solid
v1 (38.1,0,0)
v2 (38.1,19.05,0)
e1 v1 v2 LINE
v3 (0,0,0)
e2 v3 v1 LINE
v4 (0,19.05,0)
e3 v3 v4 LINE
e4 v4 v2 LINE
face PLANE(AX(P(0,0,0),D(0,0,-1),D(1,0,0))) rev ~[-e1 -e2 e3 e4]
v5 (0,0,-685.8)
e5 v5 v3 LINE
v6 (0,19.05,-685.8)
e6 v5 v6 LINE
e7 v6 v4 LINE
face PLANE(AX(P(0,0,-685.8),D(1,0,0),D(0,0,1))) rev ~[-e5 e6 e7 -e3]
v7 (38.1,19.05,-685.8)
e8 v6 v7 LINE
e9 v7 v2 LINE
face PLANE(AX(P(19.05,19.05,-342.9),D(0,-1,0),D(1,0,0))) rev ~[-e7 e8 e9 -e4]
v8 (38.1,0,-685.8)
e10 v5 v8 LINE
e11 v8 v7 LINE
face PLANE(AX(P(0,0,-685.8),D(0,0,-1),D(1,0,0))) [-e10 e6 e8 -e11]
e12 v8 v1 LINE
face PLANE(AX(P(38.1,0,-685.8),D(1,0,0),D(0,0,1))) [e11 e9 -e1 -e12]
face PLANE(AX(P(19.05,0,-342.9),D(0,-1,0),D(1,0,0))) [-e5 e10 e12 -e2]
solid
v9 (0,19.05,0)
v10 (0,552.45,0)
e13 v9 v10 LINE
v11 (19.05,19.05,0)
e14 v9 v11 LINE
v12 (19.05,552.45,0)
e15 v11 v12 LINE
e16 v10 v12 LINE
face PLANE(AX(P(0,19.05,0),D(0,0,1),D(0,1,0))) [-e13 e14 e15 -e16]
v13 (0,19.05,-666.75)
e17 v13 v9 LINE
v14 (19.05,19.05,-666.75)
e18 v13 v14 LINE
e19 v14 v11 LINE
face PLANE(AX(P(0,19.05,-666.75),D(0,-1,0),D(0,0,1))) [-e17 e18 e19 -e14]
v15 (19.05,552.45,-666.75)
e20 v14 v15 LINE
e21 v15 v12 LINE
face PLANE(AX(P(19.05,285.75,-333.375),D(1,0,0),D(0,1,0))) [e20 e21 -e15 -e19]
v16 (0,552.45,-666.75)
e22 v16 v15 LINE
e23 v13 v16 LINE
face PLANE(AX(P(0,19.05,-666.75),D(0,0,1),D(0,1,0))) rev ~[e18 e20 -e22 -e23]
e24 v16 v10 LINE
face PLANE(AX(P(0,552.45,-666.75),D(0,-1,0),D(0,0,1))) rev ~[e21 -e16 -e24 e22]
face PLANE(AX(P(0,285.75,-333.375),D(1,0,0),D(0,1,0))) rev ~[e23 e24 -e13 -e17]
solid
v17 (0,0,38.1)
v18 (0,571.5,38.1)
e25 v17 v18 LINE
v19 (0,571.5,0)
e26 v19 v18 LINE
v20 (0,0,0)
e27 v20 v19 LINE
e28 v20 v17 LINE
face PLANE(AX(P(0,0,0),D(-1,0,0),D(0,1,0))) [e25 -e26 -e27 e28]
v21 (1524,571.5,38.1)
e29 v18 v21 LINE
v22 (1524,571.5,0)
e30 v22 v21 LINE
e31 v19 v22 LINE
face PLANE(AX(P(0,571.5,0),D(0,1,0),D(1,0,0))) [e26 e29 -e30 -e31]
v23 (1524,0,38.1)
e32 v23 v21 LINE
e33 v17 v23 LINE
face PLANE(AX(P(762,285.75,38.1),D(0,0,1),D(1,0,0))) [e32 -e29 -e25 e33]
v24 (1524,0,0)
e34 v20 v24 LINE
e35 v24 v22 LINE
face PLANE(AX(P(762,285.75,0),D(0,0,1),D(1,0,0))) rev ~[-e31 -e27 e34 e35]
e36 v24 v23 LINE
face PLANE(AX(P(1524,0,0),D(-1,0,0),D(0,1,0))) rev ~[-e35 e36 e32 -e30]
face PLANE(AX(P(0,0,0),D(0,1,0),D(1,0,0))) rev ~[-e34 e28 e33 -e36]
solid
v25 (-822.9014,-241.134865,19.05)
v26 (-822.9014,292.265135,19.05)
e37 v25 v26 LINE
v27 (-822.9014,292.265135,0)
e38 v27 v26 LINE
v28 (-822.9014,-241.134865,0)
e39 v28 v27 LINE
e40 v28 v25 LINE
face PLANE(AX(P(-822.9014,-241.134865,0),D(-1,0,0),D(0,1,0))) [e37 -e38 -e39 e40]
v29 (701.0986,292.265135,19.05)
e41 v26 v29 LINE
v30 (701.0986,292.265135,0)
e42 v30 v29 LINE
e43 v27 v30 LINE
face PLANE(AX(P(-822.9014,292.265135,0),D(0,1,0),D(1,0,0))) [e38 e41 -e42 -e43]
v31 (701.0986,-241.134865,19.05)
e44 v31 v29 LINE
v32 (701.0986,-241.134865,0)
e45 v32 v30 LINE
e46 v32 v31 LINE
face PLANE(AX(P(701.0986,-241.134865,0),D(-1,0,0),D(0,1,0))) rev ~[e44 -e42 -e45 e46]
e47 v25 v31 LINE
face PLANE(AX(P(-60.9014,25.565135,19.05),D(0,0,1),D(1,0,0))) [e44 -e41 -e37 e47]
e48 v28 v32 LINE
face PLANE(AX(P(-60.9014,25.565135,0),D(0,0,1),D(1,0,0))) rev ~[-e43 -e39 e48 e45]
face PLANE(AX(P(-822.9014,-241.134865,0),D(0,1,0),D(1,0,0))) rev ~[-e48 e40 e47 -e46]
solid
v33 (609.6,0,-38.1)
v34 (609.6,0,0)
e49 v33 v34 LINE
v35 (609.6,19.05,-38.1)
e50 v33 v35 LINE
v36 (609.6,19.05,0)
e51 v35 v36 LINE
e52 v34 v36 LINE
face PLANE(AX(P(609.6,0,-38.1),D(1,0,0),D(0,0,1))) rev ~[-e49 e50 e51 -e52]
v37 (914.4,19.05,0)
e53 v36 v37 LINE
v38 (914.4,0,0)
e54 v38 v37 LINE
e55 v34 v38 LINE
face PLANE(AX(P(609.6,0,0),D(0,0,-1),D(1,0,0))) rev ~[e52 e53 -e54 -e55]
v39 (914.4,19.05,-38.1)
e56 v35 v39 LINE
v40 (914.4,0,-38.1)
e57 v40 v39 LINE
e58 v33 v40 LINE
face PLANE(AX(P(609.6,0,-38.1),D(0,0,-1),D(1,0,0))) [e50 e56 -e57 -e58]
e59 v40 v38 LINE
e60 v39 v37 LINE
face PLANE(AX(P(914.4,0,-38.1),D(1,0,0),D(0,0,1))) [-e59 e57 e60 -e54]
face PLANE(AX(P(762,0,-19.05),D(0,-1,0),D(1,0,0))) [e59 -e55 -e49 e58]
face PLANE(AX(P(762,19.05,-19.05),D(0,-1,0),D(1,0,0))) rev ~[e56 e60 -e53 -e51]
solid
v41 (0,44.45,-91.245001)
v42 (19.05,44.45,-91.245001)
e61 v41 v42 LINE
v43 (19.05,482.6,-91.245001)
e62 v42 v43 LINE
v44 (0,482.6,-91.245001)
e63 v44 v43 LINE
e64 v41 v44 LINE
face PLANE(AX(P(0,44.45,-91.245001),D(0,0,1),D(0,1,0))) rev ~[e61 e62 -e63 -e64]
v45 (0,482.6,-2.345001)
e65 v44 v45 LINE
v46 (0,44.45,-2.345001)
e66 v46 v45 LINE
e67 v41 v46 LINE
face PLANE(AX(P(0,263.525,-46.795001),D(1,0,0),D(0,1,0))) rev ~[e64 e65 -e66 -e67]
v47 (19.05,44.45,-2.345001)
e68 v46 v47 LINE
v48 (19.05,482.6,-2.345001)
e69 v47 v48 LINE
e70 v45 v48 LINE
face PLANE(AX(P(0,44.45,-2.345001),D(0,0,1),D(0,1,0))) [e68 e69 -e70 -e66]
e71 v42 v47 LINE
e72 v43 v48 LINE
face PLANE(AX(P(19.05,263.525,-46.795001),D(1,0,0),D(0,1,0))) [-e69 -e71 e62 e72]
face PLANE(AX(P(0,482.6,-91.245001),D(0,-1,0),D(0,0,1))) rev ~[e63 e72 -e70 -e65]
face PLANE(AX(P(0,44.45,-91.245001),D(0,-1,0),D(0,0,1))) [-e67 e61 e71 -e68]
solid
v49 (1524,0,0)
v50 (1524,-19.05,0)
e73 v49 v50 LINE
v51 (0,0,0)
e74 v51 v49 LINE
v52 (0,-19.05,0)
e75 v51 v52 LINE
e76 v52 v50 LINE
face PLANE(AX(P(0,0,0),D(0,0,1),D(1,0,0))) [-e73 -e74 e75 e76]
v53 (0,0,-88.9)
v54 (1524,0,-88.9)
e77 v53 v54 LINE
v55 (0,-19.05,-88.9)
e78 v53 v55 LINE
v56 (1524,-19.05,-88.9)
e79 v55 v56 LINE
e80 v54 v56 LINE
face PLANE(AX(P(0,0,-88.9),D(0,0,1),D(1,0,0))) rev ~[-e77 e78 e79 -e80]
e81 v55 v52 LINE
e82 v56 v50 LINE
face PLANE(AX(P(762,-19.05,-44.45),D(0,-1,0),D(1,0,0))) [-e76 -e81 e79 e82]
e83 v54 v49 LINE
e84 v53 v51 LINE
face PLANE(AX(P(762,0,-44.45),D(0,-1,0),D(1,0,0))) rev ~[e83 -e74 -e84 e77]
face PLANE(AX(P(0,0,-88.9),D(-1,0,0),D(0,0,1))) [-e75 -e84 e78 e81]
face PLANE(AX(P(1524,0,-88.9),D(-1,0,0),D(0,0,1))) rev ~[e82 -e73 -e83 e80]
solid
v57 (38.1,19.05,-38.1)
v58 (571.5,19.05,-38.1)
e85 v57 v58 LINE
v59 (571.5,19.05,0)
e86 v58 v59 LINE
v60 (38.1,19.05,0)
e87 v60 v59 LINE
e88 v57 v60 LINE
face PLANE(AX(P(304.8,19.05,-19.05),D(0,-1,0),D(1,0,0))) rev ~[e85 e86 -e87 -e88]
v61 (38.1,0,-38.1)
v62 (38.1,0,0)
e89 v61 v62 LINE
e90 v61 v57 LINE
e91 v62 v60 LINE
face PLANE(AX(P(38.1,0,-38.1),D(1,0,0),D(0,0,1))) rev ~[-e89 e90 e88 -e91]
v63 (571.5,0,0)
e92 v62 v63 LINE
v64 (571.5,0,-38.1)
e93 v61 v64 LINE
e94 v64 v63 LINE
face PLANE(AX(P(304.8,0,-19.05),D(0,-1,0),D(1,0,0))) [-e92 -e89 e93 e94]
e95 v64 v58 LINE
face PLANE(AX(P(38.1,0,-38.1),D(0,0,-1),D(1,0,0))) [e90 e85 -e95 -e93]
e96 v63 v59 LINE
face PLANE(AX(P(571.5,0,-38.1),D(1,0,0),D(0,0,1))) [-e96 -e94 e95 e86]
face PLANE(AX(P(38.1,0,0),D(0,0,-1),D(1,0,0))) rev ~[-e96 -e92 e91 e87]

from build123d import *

# Parameters (mm, degrees)
F0_W      = 1524
F0_H      = 571.5
F1_DEPTH  = 38.1
F2_W      = 38.1
F2_H      = 685.8
F3_DEPTH  = 19.05
F4_W      = 533.4
F4_H      = 38.1
F6_DEPTH  = 19.05
F5_W      = 304.8
F5_H      = 38.1
F7_DEPTH  = 19.05
F8_W      = 533.4
F8_H      = 666.75
F9_DEPTH  = 19.05
F10_W     = 1524
F10_H     = 533.4
F11_DEPTH = 19.05
F12_W     = 1524
F12_H     = 88.9
F13_DEPTH = 19.05
F14_W     = 438.15
F14_H     = 88.9
F15_DEPTH = 19.05


# Not quite as in the source:
# - a feature names something its author has since deleted; it is built from what else it names


with BuildPart() as f1:
    # F0 (on Top) → F1 (new body)
    with BuildSketch(Plane.XY):
        with Locations((762, 285.75)):
            Rectangle(F0_W, F0_H)
    extrude(amount=F1_DEPTH)


with BuildPart() as f3:
    # F2 (on Front) → F3 (new body)
    with BuildSketch(Plane.XZ):
        with Locations((19.05, -342.9)):
            Rectangle(F2_W, F2_H)
    extrude(amount=-F3_DEPTH)


with BuildPart() as f6:
    # F4 (on Front) → F6 (new body)
    with BuildSketch(Plane.XZ):
        with Locations((304.8, -19.05)):
            Rectangle(F4_W, F4_H)
    extrude(amount=-F6_DEPTH)


with BuildPart() as f7:
    # F5 (on Front) → F7 (new body)
    with BuildSketch(Plane.XZ):
        with Locations((762, -19.05)):
            Rectangle(F5_W, F5_H)
    extrude(amount=-F7_DEPTH)


with BuildPart() as f9:
    # F8 (on Right) → F9 (new body)
    with BuildSketch(Plane.YZ):
        with Locations((285.75, -333.375)):
            Rectangle(F8_W, F8_H)
    extrude(amount=F9_DEPTH)


with BuildPart() as f11:
    # F10 (on Top) → F11 (new body)
    with BuildSketch(Plane.XY):
        with Locations((-60.9013997018, 25.5651345968)):
            Rectangle(F10_W, F10_H)
    extrude(amount=F11_DEPTH)


with BuildPart() as f13:
    # F12 (on Front) → F13 (new body)
    with BuildSketch(Plane.XZ):
        with Locations((762, -44.45)):
            Rectangle(F12_W, F12_H)
    extrude(amount=F13_DEPTH)


with BuildPart() as f15:
    # F14 (on Right) → F15 (new body)
    with BuildSketch(Plane.YZ):
        with Locations((263.525, -46.7950011114)):
            Rectangle(F14_W, F14_H)
    extrude(amount=F15_DEPTH)


solid = Compound([f1.part, f3.part, f6.part, f7.part, f9.part, f11.part, f13.part, f15.part])
